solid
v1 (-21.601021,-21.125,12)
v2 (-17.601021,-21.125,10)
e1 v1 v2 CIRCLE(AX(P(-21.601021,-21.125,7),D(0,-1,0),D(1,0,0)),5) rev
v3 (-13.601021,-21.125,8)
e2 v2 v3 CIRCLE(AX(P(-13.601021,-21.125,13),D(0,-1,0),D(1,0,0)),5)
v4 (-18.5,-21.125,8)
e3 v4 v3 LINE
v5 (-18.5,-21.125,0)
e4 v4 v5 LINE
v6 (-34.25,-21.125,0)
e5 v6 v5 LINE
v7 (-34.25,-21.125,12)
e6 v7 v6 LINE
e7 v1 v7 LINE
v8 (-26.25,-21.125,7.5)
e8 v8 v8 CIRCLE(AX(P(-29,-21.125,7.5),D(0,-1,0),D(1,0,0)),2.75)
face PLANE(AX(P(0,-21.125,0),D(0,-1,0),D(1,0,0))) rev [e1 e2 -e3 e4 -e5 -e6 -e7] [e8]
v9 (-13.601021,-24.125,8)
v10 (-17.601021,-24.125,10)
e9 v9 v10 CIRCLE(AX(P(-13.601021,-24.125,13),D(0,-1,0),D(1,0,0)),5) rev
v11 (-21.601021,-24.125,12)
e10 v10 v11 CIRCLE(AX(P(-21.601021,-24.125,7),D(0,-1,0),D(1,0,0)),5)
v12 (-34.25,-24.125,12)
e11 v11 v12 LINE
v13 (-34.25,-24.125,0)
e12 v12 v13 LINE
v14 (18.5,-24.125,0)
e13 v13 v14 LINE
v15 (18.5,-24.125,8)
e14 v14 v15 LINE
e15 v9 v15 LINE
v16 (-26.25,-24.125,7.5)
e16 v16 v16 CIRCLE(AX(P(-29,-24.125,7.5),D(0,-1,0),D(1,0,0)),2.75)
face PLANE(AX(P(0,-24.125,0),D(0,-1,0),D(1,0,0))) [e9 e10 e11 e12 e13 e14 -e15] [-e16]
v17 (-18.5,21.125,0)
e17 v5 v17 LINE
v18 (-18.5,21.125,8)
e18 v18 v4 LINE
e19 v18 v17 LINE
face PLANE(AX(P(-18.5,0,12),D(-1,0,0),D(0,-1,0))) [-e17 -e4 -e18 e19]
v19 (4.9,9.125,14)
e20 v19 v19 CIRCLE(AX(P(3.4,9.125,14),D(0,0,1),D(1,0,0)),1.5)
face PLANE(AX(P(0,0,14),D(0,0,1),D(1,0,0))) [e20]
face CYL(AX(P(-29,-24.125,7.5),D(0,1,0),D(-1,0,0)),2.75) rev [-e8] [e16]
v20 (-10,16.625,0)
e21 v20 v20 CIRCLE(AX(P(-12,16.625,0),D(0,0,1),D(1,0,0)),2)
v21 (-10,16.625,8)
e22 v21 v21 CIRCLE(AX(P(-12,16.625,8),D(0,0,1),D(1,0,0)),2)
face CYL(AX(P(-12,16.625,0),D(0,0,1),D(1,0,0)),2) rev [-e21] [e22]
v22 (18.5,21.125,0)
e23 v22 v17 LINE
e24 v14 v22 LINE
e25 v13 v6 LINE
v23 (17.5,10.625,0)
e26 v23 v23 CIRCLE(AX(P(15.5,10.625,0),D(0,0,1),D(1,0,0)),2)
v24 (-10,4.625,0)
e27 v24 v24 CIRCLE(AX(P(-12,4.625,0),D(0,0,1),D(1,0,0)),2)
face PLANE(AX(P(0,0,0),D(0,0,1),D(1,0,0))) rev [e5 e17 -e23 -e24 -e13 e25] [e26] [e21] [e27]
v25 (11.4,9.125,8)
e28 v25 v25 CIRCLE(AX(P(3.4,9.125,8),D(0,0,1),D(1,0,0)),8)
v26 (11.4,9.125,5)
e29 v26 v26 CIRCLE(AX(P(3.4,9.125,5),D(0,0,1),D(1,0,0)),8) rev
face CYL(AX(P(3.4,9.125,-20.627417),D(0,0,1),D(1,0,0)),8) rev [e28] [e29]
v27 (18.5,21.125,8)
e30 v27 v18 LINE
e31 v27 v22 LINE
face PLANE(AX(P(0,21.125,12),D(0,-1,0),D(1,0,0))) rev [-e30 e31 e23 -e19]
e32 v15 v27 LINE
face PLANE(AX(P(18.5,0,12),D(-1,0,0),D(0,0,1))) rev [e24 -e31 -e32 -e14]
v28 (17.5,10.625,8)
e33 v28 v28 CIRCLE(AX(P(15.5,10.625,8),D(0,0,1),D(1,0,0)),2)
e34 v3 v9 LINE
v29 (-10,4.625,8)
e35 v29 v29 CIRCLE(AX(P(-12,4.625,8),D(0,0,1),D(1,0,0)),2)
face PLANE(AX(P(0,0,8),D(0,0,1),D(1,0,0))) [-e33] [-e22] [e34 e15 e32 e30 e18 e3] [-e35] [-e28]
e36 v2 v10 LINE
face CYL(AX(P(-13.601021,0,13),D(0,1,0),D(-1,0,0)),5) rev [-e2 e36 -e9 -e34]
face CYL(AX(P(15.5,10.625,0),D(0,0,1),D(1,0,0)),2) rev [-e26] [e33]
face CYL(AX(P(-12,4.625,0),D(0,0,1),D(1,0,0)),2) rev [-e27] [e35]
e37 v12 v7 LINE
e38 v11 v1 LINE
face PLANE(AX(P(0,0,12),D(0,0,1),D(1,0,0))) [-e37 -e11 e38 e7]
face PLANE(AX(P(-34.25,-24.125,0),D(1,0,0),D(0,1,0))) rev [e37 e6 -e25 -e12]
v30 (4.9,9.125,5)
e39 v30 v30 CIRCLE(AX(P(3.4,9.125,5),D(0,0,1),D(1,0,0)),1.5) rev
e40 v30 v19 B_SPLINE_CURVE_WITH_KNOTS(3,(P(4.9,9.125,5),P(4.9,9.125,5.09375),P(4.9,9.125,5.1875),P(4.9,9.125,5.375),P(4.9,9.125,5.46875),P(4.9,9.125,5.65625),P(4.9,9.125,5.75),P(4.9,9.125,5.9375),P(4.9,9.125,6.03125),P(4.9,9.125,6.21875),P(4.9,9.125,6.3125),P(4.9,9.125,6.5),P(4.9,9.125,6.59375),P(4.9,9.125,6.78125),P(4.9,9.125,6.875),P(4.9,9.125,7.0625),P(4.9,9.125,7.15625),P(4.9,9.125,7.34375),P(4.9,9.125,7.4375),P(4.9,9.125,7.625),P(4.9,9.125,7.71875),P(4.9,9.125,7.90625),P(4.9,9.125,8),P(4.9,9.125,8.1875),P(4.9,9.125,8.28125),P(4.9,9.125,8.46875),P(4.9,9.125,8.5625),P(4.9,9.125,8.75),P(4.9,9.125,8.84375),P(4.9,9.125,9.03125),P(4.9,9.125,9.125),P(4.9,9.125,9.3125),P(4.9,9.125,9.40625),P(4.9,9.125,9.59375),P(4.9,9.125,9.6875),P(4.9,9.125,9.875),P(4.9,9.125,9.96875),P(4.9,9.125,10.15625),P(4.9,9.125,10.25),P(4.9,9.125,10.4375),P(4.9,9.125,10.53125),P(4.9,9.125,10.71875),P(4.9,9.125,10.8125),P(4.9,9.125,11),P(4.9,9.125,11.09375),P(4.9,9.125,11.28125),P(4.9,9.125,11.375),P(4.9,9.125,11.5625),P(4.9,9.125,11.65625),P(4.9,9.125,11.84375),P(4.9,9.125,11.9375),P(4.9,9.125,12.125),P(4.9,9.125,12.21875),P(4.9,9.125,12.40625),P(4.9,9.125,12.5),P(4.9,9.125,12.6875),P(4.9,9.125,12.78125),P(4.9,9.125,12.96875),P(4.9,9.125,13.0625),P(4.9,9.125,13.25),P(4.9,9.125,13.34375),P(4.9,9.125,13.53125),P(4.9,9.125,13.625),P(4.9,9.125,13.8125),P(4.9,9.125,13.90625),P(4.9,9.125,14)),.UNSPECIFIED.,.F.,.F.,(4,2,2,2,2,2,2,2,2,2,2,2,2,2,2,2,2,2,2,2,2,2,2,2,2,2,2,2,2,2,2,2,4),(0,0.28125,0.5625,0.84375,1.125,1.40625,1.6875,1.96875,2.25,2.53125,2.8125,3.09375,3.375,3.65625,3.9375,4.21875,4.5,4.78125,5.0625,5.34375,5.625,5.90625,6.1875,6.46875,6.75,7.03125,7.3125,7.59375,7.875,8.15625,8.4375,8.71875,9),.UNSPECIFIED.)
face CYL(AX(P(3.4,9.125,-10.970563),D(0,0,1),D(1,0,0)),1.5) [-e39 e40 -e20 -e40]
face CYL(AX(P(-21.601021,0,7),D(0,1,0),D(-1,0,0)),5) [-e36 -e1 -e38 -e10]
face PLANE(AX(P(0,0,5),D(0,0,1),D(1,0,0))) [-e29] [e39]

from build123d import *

# Parameters (mm, degrees)
ESQUISSE1_W             = 37
ESQUISSE1_H             = 42.25
ESQUISSE1_R             = 6
BOSS_EXTRU_1_DEPTH      = 12
ESQUISSE2_R             = 6
ESQUISSE2_R_2           = 1.5
ENL_V_MAT_EXTRU_1_DEPTH = 3
ESQUISSE3_W             = 37
ESQUISSE3_H             = 12
ESQUISSE3_W_2           = 15.75
ESQUISSE3_R             = 2.75
BOSS_EXTRU_2_DEPTH      = 3
ESQUISSE4_W             = 37
ESQUISSE4_H             = 45.25
ESQUISSE4_R             = 8
ENL_V_MAT_EXTRU_2_DEPTH = 4
ESQUISSE4_3_R           = 8
ESQUISSE4_3_R_2         = 6
ESQUISSE4_3_R_3         = 1.5
ENL_V_MAT_EXTRU_4_DEPTH = 7
CONG_2_R                = 5
CONG_3_R                = 5
ESQUISSE5_R             = 2
ENL_V_MAT_EXTRU_5_DEPTH = 43.650652105
BOSS_EXTRU_3_START      = 2
ESQUISSE2_2_R           = 1.5
BOSS_EXTRU_3_DEPTH      = 2


with BuildPart() as part:
    # Esquisse1 → Boss.-Extru.1 (new body)
    # profile 1 of 2: a face of its own
    with BuildSketch(Plane.XY):
        Rectangle(ESQUISSE1_W, ESQUISSE1_H)
        with Locations((3.4, 9.125)):
            Circle(ESQUISSE1_R, mode=Mode.SUBTRACT)
    # profile 2 of 2: a face of its own
    with BuildSketch(Plane.XY):
        with Locations((3.4, 9.125)):
            Circle(ESQUISSE1_R)
    extrude(amount=BOSS_EXTRU_1_DEPTH)

    # Esquisse2 → Enlèv. mat.-Extru.1 (cut)
    with BuildSketch(Plane.XY.offset(12)):
        with Locations((3.4, 9.125)):
            Circle(ESQUISSE2_R)
        with Locations((3.4, 9.125)):
            Circle(ESQUISSE2_R_2, mode=Mode.SUBTRACT)
    extrude(amount=-ENL_V_MAT_EXTRU_1_DEPTH, mode=Mode.SUBTRACT)

    # Esquisse3 → Boss.-Extru.2 (add)
    # profile 1 of 2: a face of its own
    with BuildSketch(Plane.XZ.offset(21.125)):
        with Locations((0, 6)):
            Rectangle(ESQUISSE3_W, ESQUISSE3_H)
    # profile 2 of 2: a face of its own
    with BuildSketch(Plane.XZ.offset(21.125)):
        with Locations((-26.375, 6)):
            Rectangle(ESQUISSE3_W_2, ESQUISSE3_H)
        with Locations((-29, 7.5)):
            Circle(ESQUISSE3_R, mode=Mode.SUBTRACT)
    extrude(amount=BOSS_EXTRU_2_DEPTH)

    # Esquisse4 → Enlèv. mat.-Extru.2 (cut)
    with BuildSketch(Plane.XY.offset(12)):
        with Locations((0, -1.5)):
            Rectangle(ESQUISSE4_W, ESQUISSE4_H)
        with Locations((3.4, 9.125)):
            Circle(ESQUISSE4_R, mode=Mode.SUBTRACT)
    extrude(amount=-ENL_V_MAT_EXTRU_2_DEPTH, mode=Mode.SUBTRACT)

    # Esquisse4<3> → Enlèv. mat.-Extru.4 (cut)
    # profile 1 of 2: a face of its own
    with BuildSketch(Plane.XY.offset(12)):
        with Locations((3.4, 9.125)):
            Circle(ESQUISSE4_3_R)
        with Locations((3.4, 9.125)):
            Circle(ESQUISSE4_3_R_2, mode=Mode.SUBTRACT)
    # profile 2 of 2: a face of its own
    with BuildSketch(Plane.XY.offset(12)):
        with Locations((3.4, 9.125)):
            Circle(ESQUISSE4_3_R_2)
        with Locations((3.4, 9.125)):
            Circle(ESQUISSE4_3_R_3, mode=Mode.SUBTRACT)
    extrude(amount=-ENL_V_MAT_EXTRU_4_DEPTH, mode=Mode.SUBTRACT)

    # Congé2
    # the kernel refuses this fillet: 5 mm, written as the material it adds along each edge
    with BuildSketch(Plane(origin=(-18.5, -24.125, 8), x_dir=(1.5667467323505199e-12, 0, 1.0), z_dir=(0, 1, 0))) as cong_2_piece_1:
        with BuildLine():
            CenterArc((5, 4.898979486), CONG_2_R, 180, 78.463040967)
            Line((0, 4.898979486), (0, 0))
            Line((0, 0), (4, 0))
        make_face()
    extrude(amount=3)

    # Congé3
    cong_3_edges = [part.edges().sort_by_distance(p)[0] for p in [
        (-18.5, -22.625, 12),
    ]]
    fillet(cong_3_edges, radius=CONG_3_R)

    # Esquisse5 → Enlèv. mat.-Extru.5 (cut, through all)
    with BuildSketch(Plane.XY.offset(8)):
        with Locations((-12, 16.625)):
            Circle(ESQUISSE5_R)
        with Locations((-12, 4.625)):
            Circle(ESQUISSE5_R)
        with Locations((15.5, 10.625)):
            Circle(ESQUISSE5_R)
    extrude(amount=-ENL_V_MAT_EXTRU_5_DEPTH, mode=Mode.SUBTRACT)

    # Esquisse2<2> → Boss.-Extru.3 (add)
    with BuildSketch(Plane.XY.offset(12).offset(BOSS_EXTRU_3_START)):
        with Locations((3.4, 9.125)):
            Circle(ESQUISSE2_2_R)
    extrude(amount=-BOSS_EXTRU_3_DEPTH)


solid = part.part
